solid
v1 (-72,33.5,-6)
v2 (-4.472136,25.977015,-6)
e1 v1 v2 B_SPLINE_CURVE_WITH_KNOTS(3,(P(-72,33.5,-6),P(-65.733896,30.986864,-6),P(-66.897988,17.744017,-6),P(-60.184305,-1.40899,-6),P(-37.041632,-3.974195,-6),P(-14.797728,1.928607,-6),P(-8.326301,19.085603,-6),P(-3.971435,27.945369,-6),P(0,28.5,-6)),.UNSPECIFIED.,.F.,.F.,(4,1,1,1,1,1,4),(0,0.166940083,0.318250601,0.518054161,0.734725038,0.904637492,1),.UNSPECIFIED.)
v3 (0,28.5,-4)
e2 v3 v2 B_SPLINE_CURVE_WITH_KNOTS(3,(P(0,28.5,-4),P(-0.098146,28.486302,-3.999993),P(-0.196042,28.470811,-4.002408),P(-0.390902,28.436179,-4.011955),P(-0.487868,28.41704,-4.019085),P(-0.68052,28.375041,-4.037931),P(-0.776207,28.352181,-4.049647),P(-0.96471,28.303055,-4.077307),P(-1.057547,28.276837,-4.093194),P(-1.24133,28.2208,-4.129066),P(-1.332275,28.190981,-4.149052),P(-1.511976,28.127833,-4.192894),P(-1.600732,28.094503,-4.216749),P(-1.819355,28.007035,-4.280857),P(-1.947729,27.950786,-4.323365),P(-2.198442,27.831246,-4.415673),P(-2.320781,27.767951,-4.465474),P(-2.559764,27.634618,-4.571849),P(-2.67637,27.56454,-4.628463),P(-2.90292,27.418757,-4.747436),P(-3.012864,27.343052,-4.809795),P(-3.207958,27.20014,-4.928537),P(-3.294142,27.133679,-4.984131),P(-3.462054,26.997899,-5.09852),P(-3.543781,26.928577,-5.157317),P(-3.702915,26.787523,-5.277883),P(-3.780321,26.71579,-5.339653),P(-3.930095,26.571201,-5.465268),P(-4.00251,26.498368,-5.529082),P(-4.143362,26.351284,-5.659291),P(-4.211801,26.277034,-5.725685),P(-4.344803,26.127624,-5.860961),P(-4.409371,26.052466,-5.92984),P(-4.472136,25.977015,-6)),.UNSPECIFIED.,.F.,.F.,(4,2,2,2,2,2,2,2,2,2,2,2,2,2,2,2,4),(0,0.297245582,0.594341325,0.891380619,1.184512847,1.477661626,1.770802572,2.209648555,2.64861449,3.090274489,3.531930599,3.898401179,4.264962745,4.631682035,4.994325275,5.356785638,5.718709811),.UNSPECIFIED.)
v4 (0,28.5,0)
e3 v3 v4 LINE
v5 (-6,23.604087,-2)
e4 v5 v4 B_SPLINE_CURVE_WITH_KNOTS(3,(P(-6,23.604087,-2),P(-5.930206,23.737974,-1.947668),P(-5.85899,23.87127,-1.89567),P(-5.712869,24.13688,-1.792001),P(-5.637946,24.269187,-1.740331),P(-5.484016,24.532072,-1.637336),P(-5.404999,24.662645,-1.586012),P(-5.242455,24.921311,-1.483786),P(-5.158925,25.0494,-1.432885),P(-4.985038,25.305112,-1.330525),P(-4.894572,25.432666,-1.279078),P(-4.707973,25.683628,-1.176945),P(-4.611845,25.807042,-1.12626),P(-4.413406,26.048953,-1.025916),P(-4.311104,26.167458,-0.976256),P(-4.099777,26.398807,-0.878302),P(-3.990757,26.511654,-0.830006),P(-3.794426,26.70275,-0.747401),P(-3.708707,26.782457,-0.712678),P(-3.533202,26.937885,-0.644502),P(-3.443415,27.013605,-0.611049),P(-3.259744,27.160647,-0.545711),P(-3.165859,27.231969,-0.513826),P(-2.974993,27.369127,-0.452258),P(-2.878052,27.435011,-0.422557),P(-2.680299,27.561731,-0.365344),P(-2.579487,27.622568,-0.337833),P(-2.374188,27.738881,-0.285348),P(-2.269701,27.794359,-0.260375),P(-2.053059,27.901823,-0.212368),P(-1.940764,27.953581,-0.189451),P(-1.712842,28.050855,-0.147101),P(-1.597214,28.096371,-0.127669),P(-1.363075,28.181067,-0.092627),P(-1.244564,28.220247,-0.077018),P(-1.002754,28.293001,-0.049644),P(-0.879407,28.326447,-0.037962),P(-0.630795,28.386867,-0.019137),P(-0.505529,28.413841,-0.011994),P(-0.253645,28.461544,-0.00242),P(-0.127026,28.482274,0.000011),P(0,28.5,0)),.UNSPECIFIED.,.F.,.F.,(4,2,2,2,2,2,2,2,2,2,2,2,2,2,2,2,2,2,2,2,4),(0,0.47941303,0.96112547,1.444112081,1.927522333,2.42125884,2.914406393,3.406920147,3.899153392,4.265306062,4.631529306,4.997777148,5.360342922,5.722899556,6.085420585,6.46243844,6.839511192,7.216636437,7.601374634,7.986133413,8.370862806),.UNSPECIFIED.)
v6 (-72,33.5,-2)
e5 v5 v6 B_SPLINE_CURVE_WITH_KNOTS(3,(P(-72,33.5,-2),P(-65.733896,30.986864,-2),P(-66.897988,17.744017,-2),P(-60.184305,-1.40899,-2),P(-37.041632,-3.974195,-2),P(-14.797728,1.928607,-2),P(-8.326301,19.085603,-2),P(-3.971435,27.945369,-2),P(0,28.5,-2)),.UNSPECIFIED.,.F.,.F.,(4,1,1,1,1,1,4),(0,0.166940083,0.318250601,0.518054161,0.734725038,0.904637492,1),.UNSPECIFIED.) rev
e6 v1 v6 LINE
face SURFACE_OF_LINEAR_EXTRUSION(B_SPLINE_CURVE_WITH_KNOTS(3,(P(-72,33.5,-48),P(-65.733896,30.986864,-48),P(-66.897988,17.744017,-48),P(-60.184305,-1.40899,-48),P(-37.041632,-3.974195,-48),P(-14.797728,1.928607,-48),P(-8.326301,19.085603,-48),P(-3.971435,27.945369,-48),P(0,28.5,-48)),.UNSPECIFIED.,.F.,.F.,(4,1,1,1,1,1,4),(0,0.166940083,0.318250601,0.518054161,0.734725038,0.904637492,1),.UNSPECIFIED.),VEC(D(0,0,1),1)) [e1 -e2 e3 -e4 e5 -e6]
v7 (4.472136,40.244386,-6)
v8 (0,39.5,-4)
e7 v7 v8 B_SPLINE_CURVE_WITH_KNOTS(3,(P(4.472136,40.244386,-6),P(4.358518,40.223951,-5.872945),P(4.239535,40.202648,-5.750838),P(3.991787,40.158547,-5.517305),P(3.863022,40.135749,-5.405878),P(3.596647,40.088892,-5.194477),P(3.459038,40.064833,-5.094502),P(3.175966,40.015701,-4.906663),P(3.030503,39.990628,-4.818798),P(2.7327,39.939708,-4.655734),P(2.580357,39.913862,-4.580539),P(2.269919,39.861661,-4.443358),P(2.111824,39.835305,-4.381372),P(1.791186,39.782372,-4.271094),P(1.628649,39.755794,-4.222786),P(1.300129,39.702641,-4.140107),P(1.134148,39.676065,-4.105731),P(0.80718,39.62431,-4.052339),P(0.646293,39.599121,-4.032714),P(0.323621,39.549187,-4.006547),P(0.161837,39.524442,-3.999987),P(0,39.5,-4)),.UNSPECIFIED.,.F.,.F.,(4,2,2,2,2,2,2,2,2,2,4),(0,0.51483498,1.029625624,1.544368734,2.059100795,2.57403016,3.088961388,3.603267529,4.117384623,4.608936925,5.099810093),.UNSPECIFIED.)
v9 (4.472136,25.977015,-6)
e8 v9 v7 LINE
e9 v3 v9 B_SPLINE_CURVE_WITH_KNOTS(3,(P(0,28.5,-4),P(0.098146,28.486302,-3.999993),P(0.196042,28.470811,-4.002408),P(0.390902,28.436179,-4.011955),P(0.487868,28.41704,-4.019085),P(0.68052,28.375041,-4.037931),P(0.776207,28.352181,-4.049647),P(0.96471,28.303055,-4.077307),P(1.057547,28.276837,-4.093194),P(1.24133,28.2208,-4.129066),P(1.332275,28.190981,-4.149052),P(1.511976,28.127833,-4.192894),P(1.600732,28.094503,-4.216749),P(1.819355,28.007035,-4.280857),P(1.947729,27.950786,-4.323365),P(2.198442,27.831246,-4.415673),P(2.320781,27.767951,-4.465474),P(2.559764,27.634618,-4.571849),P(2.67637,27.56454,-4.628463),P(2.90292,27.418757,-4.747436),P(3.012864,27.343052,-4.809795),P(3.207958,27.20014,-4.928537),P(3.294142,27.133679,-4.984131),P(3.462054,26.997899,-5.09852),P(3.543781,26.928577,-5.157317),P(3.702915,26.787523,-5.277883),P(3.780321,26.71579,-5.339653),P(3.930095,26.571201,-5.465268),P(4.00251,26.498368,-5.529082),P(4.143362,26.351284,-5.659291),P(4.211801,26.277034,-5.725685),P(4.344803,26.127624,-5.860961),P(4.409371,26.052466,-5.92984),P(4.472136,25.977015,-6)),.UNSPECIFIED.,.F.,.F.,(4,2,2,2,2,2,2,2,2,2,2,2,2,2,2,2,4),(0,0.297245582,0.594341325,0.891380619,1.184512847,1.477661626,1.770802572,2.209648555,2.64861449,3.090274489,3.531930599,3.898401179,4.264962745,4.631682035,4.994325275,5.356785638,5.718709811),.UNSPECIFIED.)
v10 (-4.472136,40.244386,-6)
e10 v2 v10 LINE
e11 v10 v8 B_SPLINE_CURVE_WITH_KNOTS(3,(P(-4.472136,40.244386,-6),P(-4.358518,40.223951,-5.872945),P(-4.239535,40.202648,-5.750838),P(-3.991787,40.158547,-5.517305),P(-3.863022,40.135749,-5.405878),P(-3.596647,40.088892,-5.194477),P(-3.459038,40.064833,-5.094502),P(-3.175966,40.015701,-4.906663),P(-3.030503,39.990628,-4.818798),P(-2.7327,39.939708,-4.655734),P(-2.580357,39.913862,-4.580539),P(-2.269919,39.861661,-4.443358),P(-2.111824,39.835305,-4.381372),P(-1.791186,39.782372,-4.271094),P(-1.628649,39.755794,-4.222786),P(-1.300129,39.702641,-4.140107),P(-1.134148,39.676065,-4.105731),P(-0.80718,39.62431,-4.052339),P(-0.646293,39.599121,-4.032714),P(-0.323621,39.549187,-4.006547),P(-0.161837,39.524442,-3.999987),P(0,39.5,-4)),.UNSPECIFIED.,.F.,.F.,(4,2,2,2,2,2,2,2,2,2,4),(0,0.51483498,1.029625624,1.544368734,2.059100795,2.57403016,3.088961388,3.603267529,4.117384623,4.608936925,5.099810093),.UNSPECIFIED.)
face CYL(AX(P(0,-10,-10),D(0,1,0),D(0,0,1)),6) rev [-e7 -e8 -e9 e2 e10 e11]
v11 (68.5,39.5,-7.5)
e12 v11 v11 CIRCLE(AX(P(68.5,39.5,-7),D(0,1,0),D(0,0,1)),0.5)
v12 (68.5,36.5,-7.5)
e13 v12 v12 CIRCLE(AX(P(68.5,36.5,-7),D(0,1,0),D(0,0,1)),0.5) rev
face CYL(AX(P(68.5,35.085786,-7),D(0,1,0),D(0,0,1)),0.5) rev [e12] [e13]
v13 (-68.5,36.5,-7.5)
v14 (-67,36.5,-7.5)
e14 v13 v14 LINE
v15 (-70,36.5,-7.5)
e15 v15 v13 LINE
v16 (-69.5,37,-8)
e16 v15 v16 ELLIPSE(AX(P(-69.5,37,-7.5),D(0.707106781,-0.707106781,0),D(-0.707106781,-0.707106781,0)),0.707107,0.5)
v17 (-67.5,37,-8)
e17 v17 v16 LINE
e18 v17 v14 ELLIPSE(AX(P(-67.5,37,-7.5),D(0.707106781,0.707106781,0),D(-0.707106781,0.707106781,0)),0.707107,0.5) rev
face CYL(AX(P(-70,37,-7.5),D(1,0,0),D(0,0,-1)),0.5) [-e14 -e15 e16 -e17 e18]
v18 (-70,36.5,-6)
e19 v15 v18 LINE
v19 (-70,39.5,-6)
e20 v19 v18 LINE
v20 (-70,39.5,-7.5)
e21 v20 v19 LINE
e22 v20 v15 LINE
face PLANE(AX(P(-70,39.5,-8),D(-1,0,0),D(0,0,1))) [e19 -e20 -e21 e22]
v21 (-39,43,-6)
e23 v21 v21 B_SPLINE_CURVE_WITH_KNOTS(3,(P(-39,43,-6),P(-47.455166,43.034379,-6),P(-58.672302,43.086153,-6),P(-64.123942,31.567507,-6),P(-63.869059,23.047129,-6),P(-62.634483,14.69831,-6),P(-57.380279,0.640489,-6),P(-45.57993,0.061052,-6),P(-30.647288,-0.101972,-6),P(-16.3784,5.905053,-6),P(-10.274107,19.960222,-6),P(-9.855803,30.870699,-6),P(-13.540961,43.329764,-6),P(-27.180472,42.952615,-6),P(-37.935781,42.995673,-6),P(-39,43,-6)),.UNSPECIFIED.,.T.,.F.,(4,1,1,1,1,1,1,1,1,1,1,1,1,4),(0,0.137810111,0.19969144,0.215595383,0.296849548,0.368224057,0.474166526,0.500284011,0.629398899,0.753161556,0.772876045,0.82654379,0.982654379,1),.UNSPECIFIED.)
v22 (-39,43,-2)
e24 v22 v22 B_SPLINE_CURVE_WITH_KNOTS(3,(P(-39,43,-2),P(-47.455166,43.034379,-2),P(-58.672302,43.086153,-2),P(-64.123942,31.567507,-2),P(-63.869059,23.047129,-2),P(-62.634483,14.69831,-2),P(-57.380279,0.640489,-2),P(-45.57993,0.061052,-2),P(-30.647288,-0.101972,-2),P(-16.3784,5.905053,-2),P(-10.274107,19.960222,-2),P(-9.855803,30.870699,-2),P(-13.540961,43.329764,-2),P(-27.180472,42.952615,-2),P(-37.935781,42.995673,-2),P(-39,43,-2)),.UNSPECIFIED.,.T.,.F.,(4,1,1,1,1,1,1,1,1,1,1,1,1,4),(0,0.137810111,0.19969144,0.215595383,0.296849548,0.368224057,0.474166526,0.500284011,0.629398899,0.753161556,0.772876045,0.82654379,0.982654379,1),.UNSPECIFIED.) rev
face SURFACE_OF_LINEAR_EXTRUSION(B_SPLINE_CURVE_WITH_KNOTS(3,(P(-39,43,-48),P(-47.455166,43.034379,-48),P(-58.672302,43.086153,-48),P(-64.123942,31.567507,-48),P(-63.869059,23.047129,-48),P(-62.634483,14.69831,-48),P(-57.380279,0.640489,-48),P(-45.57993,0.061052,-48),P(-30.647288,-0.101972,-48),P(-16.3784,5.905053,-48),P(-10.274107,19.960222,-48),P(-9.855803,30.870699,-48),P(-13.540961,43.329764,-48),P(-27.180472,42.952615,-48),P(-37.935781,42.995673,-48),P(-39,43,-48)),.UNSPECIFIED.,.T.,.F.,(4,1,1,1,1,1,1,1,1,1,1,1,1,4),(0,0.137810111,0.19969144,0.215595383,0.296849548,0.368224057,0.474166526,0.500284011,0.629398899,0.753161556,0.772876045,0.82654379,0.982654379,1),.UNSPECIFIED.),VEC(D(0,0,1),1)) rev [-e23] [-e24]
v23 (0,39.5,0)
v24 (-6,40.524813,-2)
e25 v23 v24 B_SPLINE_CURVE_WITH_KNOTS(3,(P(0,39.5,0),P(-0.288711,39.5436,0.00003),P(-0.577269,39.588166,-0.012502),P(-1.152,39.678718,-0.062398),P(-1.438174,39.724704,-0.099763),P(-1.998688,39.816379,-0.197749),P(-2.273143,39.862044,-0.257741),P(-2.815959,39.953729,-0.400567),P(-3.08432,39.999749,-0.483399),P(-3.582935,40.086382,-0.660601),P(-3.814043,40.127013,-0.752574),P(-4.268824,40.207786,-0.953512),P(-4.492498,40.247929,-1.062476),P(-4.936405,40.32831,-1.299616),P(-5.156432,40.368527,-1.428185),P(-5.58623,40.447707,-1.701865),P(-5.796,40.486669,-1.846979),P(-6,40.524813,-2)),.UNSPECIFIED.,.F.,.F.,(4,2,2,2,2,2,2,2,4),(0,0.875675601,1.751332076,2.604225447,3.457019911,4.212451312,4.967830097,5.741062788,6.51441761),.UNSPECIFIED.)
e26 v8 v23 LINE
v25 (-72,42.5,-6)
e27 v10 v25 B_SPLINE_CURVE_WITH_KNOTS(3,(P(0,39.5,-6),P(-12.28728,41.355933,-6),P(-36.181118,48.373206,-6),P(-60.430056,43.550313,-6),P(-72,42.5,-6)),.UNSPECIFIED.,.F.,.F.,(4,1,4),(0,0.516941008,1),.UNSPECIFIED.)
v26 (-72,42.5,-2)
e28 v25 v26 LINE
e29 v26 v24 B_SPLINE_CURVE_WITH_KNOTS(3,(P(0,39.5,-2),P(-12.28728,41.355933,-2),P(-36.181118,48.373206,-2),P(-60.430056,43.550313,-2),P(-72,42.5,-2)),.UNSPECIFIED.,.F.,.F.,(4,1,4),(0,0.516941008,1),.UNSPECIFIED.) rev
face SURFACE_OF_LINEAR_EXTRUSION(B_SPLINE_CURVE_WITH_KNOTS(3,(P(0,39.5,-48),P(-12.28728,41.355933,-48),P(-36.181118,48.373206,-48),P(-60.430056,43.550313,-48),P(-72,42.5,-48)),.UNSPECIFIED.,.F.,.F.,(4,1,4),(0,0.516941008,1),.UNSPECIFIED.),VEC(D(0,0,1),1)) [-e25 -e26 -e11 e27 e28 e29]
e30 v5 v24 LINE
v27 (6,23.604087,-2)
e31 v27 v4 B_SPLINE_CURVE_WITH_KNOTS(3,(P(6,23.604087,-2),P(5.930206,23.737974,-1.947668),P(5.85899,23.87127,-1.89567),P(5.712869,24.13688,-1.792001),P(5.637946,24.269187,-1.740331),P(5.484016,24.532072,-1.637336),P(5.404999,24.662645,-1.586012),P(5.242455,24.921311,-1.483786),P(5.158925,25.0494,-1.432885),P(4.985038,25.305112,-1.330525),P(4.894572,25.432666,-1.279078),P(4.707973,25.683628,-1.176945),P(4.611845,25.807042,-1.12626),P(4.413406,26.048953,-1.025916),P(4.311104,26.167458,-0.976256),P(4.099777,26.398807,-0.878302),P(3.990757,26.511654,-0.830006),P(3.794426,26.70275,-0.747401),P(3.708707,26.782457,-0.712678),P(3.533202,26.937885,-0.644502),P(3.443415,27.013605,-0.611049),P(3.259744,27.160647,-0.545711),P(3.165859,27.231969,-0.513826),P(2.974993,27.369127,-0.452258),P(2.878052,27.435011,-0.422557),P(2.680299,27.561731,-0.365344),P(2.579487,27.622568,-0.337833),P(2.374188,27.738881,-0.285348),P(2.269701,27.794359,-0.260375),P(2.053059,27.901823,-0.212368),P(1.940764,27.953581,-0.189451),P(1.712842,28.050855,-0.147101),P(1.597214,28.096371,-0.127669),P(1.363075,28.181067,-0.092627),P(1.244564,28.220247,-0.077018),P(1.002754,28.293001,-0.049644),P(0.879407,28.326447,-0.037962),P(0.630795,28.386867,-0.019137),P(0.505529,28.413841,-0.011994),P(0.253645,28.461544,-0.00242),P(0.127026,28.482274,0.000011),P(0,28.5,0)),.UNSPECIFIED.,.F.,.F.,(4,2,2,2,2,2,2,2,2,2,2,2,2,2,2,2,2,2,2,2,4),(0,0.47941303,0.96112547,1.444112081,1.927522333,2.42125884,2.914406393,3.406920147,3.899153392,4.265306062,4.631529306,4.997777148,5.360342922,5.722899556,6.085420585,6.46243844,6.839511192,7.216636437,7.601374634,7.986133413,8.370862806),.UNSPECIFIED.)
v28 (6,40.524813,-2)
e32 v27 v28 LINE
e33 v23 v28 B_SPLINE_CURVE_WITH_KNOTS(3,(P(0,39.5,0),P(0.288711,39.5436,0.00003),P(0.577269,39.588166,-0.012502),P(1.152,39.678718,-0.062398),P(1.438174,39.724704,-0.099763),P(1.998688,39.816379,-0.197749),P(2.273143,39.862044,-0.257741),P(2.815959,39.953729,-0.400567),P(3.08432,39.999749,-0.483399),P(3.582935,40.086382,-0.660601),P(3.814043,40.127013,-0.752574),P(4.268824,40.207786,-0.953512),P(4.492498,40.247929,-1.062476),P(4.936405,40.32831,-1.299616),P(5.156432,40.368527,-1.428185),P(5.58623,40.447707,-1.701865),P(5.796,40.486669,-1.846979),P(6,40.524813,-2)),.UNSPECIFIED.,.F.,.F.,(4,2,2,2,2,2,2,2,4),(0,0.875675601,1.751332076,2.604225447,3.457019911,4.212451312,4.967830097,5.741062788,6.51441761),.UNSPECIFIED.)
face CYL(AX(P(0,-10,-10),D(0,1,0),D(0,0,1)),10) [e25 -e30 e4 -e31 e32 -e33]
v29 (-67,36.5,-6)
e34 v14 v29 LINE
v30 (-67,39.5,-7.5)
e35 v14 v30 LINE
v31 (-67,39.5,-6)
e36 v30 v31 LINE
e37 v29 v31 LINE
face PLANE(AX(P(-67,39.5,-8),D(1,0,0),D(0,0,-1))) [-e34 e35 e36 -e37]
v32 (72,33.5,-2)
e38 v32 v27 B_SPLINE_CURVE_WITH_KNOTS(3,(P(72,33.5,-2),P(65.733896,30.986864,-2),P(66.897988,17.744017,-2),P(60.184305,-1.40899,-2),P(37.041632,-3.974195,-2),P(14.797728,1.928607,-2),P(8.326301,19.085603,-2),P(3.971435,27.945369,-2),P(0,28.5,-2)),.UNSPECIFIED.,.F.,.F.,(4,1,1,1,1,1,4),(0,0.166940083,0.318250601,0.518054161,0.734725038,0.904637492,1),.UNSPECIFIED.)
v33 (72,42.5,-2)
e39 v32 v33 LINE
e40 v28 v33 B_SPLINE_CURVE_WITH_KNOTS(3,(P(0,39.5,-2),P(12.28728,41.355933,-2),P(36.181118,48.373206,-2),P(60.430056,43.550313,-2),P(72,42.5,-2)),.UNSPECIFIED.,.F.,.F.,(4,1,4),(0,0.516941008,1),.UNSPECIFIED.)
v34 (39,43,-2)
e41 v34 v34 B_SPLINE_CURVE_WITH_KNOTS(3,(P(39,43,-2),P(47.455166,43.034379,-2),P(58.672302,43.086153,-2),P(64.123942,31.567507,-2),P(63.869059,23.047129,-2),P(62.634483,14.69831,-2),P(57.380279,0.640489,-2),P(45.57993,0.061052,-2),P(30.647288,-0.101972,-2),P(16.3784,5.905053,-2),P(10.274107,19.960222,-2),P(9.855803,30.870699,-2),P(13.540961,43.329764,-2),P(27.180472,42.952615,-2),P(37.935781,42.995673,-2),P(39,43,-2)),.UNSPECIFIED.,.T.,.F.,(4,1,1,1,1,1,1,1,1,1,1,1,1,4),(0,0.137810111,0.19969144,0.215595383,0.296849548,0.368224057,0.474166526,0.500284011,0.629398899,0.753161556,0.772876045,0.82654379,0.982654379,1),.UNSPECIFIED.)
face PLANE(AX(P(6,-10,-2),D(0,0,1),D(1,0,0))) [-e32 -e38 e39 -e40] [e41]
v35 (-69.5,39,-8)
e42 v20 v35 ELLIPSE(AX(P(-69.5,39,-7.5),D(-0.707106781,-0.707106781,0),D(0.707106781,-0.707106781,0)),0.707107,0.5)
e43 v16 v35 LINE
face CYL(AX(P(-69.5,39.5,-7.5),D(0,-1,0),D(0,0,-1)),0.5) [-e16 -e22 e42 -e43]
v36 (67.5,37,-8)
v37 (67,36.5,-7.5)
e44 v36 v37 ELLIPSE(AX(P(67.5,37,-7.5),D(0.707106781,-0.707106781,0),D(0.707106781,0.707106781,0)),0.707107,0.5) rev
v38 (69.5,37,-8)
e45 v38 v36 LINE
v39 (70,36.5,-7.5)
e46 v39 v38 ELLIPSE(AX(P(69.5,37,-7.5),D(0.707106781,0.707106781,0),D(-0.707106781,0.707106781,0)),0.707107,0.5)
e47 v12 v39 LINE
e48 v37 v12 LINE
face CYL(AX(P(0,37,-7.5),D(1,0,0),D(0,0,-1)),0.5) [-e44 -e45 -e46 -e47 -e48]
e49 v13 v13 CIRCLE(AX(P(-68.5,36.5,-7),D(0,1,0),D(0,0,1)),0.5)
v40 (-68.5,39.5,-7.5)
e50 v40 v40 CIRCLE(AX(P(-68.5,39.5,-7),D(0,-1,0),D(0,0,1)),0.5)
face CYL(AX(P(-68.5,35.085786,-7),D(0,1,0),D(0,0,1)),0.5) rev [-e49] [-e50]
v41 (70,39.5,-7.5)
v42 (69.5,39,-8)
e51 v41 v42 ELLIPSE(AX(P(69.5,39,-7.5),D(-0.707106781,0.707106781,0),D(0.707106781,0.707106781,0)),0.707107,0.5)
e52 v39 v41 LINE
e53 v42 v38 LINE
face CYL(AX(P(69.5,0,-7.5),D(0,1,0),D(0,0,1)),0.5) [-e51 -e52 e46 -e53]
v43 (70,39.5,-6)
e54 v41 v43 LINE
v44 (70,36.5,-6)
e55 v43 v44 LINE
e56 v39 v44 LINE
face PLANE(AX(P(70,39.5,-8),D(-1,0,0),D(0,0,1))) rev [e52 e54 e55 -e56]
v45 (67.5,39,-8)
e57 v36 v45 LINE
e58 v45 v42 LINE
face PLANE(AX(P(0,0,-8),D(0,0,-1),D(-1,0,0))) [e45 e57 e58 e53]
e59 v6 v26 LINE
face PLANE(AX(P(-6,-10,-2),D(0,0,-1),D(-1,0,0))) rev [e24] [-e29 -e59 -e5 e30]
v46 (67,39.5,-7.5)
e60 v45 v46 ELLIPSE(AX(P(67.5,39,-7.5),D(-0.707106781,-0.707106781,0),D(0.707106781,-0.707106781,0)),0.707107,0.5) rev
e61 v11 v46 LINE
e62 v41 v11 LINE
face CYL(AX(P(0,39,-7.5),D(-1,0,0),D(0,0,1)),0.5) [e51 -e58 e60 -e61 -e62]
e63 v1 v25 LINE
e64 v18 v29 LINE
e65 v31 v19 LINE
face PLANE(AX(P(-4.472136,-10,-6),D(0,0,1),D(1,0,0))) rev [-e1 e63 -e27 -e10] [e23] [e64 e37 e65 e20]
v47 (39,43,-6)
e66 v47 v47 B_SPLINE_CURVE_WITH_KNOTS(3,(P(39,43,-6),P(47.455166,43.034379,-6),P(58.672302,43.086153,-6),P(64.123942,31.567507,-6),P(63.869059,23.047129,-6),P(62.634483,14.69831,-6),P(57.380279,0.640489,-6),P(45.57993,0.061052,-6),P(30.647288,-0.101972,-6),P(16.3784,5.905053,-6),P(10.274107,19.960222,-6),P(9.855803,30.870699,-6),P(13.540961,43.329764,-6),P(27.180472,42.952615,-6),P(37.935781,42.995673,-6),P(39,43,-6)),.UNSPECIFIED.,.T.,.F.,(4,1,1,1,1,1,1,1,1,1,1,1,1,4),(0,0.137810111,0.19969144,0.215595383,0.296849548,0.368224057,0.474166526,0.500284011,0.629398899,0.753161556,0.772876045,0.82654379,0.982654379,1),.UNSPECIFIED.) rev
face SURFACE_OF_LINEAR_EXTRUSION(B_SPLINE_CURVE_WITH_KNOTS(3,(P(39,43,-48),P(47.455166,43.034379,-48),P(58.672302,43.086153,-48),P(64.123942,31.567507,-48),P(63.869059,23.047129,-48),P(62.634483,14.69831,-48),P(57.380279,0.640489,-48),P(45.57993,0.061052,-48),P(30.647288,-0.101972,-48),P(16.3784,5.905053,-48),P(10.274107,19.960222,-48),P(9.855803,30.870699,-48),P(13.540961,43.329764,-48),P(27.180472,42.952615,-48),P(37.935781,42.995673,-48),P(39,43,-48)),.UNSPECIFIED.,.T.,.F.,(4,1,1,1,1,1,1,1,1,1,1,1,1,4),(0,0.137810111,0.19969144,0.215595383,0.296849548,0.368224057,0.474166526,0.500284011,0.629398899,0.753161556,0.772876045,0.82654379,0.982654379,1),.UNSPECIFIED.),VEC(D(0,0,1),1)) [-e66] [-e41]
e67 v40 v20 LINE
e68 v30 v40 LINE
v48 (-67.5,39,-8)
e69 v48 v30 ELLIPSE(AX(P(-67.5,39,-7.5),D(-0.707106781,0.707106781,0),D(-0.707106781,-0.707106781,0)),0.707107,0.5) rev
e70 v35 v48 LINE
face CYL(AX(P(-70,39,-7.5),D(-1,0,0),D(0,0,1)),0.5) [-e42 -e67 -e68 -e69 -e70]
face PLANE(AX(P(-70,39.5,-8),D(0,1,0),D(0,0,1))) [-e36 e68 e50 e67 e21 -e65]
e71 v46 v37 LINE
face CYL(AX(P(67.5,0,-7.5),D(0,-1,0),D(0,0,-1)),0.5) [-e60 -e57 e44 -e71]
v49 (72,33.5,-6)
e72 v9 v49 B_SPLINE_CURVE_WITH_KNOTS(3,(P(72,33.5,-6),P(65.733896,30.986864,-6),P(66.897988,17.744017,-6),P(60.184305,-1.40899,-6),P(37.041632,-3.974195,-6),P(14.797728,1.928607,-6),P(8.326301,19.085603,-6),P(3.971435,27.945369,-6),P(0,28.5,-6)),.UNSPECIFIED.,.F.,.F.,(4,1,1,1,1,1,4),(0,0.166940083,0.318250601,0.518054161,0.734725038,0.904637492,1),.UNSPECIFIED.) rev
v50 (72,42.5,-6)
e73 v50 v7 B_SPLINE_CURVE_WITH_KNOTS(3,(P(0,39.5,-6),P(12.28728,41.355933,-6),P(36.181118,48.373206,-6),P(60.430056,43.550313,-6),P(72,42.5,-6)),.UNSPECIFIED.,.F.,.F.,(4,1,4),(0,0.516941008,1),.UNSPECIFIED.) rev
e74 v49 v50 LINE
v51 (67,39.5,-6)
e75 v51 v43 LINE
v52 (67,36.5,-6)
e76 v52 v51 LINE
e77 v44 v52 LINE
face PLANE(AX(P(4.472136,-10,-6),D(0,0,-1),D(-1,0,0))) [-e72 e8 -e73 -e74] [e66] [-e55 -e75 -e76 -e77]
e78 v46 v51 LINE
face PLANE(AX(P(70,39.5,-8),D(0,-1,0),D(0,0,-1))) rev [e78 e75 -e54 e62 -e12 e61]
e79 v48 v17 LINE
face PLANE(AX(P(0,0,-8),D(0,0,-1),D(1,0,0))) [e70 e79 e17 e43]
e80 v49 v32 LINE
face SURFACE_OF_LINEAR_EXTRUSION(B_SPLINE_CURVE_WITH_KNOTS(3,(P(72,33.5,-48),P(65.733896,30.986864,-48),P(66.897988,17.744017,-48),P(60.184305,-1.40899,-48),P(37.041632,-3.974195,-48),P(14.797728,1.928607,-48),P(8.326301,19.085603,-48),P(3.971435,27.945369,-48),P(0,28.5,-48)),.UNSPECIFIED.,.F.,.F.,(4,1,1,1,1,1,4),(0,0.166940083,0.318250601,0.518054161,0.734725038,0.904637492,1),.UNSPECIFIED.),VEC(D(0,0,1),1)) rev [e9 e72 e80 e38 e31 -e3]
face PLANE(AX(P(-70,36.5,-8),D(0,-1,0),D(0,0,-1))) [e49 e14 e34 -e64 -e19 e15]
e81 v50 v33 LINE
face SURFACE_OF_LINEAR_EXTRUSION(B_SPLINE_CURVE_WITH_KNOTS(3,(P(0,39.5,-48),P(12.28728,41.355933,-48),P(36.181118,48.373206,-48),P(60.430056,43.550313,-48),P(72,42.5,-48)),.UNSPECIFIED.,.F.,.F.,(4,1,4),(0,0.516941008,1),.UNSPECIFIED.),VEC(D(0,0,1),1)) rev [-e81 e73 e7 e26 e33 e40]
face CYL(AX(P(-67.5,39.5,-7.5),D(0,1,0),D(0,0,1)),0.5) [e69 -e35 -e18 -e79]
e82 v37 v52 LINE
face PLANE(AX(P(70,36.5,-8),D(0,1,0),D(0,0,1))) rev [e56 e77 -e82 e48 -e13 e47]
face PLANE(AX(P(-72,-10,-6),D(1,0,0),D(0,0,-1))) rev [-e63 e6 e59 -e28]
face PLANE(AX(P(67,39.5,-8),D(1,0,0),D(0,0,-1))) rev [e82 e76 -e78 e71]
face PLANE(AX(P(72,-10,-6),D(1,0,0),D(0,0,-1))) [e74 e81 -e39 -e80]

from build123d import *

# Parameters (mm, degrees)
BOSS_EXTRUDE2_START = -10
BOSS_EXTRUDE2_DEPTH = 58
CUT_EXTRUDE1_DEPTH  = 48
CUT_EXTRUDE3_DEPTH  = 48
SKETCH7_W           = 3
SKETCH7_H           = 3
BOSS_EXTRUDE4_DEPTH = 2
FILLET1_R           = 0.5
SKETCH8_R           = 0.5
CUT_EXTRUDE4_DEPTH  = 3


# Read off the part's stored shape, not the designer's step: Mirror3
with BuildPart() as part:
    # Sketch2 → Boss-Extrude2 (new body)
    with BuildSketch(Plane(origin=(0, 0, 0), x_dir=(1, 0, 0), z_dir=(0, 1, 0)).offset(BOSS_EXTRUDE2_START)):
        with BuildLine():
            Line((6, 2), (72, 2))
            Line((72, 2), (72, 6))
            Line((72, 6), (4.472135955, 6))
            ThreePointArc((4.472135955, 6), (2.449489743, 4.522774425), (0, 4))
            Line((0, 4), (0, 0))
            ThreePointArc((0, 0), (3.16227766, 0.513167019), (6, 2))
        make_face()
    boss_extrude2 = extrude(amount=BOSS_EXTRUDE2_DEPTH)

    # Sketch4 → Cut-Extrude1 (cut)
    with BuildSketch(Plane.XY):
        with BuildLine():
            Line((75.181024804, -21.70251563), (72, 33.5))
            add(Edge.make_bspline(
                [(72, 33.5), (65.733895707, 30.986863851), (66.897988293, 17.744017336), (60.184304866, -1.408989634), (37.041632207, -3.974195098), (14.79772784, 1.928607021), (8.326301166, 19.085602566), (3.971434767, 27.945368893), (0, 28.5)],
                knots=[0, 0, 0, 0, 0.166940083, 0.318250601, 0.518054161, 0.734725038, 0.904637492, 1, 1, 1, 1], degree=3))
            Line((0, 28.5), (-1.793667206, -21.70251563))
            Line((-1.793667206, -21.70251563), (75.181024804, -21.70251563))
        make_face()
        with BuildLine():
            Line((0, 39.5), (0, 66.878987003))
            Line((0, 66.878987003), (72, 65.421074967))
            Line((72, 65.421074967), (72, 42.5))
            add(Edge.make_bspline(
                [(0, 39.5), (12.28727979, 41.355933166), (36.181117827, 48.373206471), (60.430055597, 43.550313065), (72, 42.5)],
                knots=[0, 0, 0, 0, 0.516941008, 1, 1, 1, 1], degree=3))
        make_face()
    cut_extrude1 = extrude(amount=-CUT_EXTRUDE1_DEPTH, mode=Mode.SUBTRACT)

    # Sketch3 → Cut-Extrude3 (cut)
    with BuildSketch(Plane.XY):
        with BuildLine():
            add(Edge.make_bspline(
                [(39, 43), (47.455166281, 43.034379293), (58.672301943, 43.086153016), (64.123941507, 31.567507143), (63.869059347, 23.047129354), (62.634483109, 14.698309693), (57.380279449, 0.640489267), (45.579929681, 0.061052081), (30.647288037, -0.10197224), (16.378399599, 5.905052669), (10.27410697, 19.960221638), (9.855802774, 30.870699355), (13.540960725, 43.329764048), (27.180471598, 42.952614894), (37.93578121, 42.995672813), (39, 43)],
                knots=[0, 0, 0, 0, 0.137810111, 0.19969144, 0.215595383, 0.296849548, 0.368224057, 0.474166526, 0.500284011, 0.629398899, 0.753161556, 0.772876045, 0.82654379, 0.982654379, 1, 1, 1, 1], degree=3))
        make_face()
    cut_extrude3 = extrude(amount=-CUT_EXTRUDE3_DEPTH, mode=Mode.SUBTRACT)

    # Mirror2: Boss-Extrude2, Cut-Extrude1, Cut-Extrude3 across plane
    add(boss_extrude2.mirror(Plane(origin=(0, 0, 0), x_dir=(0, 0, 1), z_dir=(1, 0, 0))))
    add(cut_extrude1.mirror(Plane(origin=(0, 0, 0), x_dir=(0, 0, 1), z_dir=(1, 0, 0))), mode=Mode.SUBTRACT)
    add(cut_extrude3.mirror(Plane(origin=(0, 0, 0), x_dir=(0, 0, 1), z_dir=(1, 0, 0))), mode=Mode.SUBTRACT)

    # Sketch7 → Boss-Extrude4 (add)
    with BuildSketch(Plane(origin=(0, 0, -6), x_dir=(-1, 0, 0), z_dir=(0, 0, -1))):
        with Locations((-68.5, 38)):
            Rectangle(SKETCH7_W, SKETCH7_H)
    extrude(amount=BOSS_EXTRUDE4_DEPTH)

    # Fillet1
    fillet1_edges = [part.edges().sort_by_distance(p)[0] for p in [
        (70, 38, -8),
        (68.5, 36.5, -8),
        (67, 38, -8),
        (68.5, 39.5, -8),
    ]]
    fillet(fillet1_edges, radius=FILLET1_R)

    # Sketch8 → Cut-Extrude4 (cut)
    with BuildSketch(Plane(origin=(0, 39.5, 0), x_dir=(1, 0, 0), z_dir=(0, 1, 0))):
        with Locations(Location((68.5, 7, 0), (0, 0, 90))):
            Circle(SKETCH8_R)
    extrude(amount=-CUT_EXTRUDE4_DEPTH, mode=Mode.SUBTRACT)

    # Mirror3: part across plane


with BuildPart() as part_1:
    add(part.part)
    add(part.part.mirror(Plane(origin=(0, 0, 0), x_dir=(0, 0, 1), z_dir=(1, 0, 0))))


solid = part_1.part
